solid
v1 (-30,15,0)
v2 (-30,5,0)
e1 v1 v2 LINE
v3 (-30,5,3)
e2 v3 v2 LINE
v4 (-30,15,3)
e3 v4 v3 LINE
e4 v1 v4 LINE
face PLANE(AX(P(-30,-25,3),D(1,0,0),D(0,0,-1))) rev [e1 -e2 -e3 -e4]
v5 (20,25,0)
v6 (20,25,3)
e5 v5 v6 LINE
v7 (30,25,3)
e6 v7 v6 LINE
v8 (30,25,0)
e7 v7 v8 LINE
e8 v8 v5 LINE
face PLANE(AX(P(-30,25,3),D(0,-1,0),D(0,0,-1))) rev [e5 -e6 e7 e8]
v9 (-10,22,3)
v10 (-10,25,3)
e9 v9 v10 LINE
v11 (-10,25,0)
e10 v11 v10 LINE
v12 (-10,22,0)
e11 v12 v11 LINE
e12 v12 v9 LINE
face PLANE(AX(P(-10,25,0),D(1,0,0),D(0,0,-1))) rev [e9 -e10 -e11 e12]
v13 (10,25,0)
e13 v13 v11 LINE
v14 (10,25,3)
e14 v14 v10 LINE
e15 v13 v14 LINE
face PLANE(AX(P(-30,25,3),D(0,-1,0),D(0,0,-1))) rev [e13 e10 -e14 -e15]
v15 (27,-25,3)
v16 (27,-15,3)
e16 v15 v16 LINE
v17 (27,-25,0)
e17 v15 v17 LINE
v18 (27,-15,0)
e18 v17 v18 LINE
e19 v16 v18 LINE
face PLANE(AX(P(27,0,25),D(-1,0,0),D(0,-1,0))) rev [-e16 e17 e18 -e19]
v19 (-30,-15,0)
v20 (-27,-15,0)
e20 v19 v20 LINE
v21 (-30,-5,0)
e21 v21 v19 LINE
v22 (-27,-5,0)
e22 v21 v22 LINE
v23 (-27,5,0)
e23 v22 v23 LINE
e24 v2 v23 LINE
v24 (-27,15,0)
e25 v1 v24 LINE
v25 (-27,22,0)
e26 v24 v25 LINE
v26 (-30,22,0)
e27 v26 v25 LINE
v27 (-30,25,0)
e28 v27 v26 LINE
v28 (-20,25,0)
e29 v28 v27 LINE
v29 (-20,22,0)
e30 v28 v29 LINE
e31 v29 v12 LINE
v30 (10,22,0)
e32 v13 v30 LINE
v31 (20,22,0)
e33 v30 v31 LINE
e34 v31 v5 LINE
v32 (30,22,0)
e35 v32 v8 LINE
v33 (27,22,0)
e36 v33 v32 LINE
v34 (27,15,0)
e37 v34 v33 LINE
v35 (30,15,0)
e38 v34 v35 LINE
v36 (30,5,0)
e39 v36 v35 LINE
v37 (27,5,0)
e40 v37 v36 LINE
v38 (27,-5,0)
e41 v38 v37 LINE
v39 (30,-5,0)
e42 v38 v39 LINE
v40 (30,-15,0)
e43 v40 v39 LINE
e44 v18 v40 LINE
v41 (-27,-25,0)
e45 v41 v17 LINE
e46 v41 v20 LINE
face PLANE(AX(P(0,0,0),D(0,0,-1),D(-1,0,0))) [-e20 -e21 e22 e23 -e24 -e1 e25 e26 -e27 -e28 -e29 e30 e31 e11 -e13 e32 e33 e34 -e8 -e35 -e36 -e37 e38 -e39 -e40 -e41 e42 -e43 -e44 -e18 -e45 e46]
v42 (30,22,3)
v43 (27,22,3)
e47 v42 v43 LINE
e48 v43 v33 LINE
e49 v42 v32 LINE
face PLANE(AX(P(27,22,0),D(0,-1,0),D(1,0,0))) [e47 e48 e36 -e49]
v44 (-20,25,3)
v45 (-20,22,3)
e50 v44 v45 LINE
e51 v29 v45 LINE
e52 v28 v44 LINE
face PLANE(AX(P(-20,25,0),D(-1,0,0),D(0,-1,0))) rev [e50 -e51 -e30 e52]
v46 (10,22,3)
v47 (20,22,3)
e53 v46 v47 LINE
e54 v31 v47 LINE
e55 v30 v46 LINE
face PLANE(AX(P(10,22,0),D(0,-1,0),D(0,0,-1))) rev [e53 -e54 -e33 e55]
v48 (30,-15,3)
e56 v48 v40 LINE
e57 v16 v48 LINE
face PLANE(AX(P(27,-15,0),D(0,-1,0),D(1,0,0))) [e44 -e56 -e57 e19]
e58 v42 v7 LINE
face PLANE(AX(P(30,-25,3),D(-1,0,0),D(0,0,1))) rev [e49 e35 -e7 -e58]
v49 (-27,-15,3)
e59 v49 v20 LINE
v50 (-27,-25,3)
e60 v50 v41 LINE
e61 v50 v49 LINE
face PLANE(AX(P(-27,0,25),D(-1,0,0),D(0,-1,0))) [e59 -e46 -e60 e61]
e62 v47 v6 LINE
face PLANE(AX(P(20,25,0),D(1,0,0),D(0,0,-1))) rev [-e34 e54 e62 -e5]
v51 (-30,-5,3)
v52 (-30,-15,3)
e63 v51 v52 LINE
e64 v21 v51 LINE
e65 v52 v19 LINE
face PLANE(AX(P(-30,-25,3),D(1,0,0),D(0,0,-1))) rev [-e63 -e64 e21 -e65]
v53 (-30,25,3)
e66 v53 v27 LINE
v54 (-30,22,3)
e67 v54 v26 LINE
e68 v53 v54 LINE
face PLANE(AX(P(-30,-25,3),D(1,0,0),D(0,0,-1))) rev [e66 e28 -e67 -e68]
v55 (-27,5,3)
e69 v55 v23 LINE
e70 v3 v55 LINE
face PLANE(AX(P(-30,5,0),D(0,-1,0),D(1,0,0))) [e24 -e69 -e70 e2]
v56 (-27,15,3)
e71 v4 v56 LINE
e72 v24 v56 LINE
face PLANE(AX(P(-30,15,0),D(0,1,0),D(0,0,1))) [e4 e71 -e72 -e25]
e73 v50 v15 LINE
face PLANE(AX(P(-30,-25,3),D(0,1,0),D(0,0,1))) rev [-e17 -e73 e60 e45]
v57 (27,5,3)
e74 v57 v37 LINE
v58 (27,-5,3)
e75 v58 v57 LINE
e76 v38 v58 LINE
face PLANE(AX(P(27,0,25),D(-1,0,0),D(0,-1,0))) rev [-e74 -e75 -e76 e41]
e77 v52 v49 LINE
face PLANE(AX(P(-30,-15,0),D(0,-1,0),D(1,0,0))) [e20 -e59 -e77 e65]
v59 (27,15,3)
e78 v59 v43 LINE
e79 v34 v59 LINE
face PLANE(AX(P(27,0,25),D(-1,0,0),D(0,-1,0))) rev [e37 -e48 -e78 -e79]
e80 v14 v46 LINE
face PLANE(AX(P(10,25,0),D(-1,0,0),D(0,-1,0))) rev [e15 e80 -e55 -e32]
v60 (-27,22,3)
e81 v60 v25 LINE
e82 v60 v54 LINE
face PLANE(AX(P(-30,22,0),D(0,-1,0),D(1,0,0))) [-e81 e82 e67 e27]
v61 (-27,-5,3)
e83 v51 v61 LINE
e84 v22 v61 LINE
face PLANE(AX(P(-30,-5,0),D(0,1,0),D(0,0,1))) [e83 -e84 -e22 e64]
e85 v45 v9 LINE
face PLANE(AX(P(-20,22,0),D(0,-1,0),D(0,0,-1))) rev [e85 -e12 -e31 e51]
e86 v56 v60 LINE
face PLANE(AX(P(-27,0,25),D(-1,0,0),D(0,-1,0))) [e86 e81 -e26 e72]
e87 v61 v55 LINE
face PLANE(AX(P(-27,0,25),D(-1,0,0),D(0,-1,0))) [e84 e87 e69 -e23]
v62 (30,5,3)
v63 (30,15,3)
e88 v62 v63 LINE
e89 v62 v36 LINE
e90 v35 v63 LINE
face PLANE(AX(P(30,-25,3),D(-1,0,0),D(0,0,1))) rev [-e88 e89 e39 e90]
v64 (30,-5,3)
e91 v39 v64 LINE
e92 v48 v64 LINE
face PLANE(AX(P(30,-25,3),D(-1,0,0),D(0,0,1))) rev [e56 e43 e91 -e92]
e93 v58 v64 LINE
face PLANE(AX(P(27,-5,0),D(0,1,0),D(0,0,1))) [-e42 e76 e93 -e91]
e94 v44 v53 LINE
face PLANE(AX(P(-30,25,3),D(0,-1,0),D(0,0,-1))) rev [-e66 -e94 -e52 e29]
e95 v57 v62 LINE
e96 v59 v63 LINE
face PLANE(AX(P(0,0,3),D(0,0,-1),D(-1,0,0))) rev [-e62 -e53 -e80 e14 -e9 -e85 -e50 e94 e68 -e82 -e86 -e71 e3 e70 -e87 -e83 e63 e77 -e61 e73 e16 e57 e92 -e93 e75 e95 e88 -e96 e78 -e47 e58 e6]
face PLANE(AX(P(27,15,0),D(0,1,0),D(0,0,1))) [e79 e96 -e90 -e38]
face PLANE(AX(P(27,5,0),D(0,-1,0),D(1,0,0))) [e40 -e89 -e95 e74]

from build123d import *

# Parameters (mm, degrees)
SKETCH1_W             = 60
SKETCH1_H             = 50
BOSS_EXTRUDE1_DEPTH   = 3
SKETCH2_W             = 10
SKETCH2_H             = 3
CUT_EXTRUDE1_DEPTH    = 3
CAVITY3_START         = -30
CAVITY3_OUTLINE_W     = 7
CAVITY3_OUTLINE_H     = 3
CAVITY3_OUTLINE_W_2   = 10
CAVITY3_DEPTH         = 3
CAVITY3_START_2       = 27
CAVITY3_2_OUTLINE_W   = 7
CAVITY3_2_OUTLINE_H   = 3
CAVITY3_2_OUTLINE_W_2 = 10
CAVITY3_2_DEPTH       = 3


# Read off the part's stored shape, not the designer's step: Cavity3
with BuildPart() as part:
    # Sketch1 → Boss-Extrude1 (new body)
    with BuildSketch(Plane.XY):
        Rectangle(SKETCH1_W, SKETCH1_H)
    extrude(amount=BOSS_EXTRUDE1_DEPTH)

    # Sketch2 → Cut-Extrude1 (cut)
    with BuildSketch(Plane.XY.offset(3)):
        with Locations((-15, 23.5)):
            Rectangle(SKETCH2_W, SKETCH2_H)
        with Locations((15, 23.5)):
            Rectangle(SKETCH2_W, SKETCH2_H)
    extrude(amount=-CUT_EXTRUDE1_DEPTH, mode=Mode.SUBTRACT)

    # Cavity3 outline → Cavity3 (cut)
    with BuildSketch(Plane.YZ.offset(CAVITY3_START)):
        with Locations((18.5, 1.5)):
            Rectangle(CAVITY3_OUTLINE_W, CAVITY3_OUTLINE_H)
        with Locations((0, 1.5)):
            Rectangle(CAVITY3_OUTLINE_W_2, CAVITY3_OUTLINE_H)
        with Locations((-20, 1.5)):
            Rectangle(CAVITY3_OUTLINE_W_2, CAVITY3_OUTLINE_H)
    extrude(amount=CAVITY3_DEPTH, mode=Mode.SUBTRACT)

    # Cavity3 2 outline → Cavity3 2 (cut)
    with BuildSketch(Plane.YZ.offset(CAVITY3_START_2)):
        with Locations((18.5, 1.5)):
            Rectangle(CAVITY3_2_OUTLINE_W, CAVITY3_2_OUTLINE_H)
        with Locations((0, 1.5)):
            Rectangle(CAVITY3_2_OUTLINE_W_2, CAVITY3_2_OUTLINE_H)
        with Locations((-20, 1.5)):
            Rectangle(CAVITY3_2_OUTLINE_W_2, CAVITY3_2_OUTLINE_H)
    extrude(amount=CAVITY3_2_DEPTH, mode=Mode.SUBTRACT)


solid = part.part
